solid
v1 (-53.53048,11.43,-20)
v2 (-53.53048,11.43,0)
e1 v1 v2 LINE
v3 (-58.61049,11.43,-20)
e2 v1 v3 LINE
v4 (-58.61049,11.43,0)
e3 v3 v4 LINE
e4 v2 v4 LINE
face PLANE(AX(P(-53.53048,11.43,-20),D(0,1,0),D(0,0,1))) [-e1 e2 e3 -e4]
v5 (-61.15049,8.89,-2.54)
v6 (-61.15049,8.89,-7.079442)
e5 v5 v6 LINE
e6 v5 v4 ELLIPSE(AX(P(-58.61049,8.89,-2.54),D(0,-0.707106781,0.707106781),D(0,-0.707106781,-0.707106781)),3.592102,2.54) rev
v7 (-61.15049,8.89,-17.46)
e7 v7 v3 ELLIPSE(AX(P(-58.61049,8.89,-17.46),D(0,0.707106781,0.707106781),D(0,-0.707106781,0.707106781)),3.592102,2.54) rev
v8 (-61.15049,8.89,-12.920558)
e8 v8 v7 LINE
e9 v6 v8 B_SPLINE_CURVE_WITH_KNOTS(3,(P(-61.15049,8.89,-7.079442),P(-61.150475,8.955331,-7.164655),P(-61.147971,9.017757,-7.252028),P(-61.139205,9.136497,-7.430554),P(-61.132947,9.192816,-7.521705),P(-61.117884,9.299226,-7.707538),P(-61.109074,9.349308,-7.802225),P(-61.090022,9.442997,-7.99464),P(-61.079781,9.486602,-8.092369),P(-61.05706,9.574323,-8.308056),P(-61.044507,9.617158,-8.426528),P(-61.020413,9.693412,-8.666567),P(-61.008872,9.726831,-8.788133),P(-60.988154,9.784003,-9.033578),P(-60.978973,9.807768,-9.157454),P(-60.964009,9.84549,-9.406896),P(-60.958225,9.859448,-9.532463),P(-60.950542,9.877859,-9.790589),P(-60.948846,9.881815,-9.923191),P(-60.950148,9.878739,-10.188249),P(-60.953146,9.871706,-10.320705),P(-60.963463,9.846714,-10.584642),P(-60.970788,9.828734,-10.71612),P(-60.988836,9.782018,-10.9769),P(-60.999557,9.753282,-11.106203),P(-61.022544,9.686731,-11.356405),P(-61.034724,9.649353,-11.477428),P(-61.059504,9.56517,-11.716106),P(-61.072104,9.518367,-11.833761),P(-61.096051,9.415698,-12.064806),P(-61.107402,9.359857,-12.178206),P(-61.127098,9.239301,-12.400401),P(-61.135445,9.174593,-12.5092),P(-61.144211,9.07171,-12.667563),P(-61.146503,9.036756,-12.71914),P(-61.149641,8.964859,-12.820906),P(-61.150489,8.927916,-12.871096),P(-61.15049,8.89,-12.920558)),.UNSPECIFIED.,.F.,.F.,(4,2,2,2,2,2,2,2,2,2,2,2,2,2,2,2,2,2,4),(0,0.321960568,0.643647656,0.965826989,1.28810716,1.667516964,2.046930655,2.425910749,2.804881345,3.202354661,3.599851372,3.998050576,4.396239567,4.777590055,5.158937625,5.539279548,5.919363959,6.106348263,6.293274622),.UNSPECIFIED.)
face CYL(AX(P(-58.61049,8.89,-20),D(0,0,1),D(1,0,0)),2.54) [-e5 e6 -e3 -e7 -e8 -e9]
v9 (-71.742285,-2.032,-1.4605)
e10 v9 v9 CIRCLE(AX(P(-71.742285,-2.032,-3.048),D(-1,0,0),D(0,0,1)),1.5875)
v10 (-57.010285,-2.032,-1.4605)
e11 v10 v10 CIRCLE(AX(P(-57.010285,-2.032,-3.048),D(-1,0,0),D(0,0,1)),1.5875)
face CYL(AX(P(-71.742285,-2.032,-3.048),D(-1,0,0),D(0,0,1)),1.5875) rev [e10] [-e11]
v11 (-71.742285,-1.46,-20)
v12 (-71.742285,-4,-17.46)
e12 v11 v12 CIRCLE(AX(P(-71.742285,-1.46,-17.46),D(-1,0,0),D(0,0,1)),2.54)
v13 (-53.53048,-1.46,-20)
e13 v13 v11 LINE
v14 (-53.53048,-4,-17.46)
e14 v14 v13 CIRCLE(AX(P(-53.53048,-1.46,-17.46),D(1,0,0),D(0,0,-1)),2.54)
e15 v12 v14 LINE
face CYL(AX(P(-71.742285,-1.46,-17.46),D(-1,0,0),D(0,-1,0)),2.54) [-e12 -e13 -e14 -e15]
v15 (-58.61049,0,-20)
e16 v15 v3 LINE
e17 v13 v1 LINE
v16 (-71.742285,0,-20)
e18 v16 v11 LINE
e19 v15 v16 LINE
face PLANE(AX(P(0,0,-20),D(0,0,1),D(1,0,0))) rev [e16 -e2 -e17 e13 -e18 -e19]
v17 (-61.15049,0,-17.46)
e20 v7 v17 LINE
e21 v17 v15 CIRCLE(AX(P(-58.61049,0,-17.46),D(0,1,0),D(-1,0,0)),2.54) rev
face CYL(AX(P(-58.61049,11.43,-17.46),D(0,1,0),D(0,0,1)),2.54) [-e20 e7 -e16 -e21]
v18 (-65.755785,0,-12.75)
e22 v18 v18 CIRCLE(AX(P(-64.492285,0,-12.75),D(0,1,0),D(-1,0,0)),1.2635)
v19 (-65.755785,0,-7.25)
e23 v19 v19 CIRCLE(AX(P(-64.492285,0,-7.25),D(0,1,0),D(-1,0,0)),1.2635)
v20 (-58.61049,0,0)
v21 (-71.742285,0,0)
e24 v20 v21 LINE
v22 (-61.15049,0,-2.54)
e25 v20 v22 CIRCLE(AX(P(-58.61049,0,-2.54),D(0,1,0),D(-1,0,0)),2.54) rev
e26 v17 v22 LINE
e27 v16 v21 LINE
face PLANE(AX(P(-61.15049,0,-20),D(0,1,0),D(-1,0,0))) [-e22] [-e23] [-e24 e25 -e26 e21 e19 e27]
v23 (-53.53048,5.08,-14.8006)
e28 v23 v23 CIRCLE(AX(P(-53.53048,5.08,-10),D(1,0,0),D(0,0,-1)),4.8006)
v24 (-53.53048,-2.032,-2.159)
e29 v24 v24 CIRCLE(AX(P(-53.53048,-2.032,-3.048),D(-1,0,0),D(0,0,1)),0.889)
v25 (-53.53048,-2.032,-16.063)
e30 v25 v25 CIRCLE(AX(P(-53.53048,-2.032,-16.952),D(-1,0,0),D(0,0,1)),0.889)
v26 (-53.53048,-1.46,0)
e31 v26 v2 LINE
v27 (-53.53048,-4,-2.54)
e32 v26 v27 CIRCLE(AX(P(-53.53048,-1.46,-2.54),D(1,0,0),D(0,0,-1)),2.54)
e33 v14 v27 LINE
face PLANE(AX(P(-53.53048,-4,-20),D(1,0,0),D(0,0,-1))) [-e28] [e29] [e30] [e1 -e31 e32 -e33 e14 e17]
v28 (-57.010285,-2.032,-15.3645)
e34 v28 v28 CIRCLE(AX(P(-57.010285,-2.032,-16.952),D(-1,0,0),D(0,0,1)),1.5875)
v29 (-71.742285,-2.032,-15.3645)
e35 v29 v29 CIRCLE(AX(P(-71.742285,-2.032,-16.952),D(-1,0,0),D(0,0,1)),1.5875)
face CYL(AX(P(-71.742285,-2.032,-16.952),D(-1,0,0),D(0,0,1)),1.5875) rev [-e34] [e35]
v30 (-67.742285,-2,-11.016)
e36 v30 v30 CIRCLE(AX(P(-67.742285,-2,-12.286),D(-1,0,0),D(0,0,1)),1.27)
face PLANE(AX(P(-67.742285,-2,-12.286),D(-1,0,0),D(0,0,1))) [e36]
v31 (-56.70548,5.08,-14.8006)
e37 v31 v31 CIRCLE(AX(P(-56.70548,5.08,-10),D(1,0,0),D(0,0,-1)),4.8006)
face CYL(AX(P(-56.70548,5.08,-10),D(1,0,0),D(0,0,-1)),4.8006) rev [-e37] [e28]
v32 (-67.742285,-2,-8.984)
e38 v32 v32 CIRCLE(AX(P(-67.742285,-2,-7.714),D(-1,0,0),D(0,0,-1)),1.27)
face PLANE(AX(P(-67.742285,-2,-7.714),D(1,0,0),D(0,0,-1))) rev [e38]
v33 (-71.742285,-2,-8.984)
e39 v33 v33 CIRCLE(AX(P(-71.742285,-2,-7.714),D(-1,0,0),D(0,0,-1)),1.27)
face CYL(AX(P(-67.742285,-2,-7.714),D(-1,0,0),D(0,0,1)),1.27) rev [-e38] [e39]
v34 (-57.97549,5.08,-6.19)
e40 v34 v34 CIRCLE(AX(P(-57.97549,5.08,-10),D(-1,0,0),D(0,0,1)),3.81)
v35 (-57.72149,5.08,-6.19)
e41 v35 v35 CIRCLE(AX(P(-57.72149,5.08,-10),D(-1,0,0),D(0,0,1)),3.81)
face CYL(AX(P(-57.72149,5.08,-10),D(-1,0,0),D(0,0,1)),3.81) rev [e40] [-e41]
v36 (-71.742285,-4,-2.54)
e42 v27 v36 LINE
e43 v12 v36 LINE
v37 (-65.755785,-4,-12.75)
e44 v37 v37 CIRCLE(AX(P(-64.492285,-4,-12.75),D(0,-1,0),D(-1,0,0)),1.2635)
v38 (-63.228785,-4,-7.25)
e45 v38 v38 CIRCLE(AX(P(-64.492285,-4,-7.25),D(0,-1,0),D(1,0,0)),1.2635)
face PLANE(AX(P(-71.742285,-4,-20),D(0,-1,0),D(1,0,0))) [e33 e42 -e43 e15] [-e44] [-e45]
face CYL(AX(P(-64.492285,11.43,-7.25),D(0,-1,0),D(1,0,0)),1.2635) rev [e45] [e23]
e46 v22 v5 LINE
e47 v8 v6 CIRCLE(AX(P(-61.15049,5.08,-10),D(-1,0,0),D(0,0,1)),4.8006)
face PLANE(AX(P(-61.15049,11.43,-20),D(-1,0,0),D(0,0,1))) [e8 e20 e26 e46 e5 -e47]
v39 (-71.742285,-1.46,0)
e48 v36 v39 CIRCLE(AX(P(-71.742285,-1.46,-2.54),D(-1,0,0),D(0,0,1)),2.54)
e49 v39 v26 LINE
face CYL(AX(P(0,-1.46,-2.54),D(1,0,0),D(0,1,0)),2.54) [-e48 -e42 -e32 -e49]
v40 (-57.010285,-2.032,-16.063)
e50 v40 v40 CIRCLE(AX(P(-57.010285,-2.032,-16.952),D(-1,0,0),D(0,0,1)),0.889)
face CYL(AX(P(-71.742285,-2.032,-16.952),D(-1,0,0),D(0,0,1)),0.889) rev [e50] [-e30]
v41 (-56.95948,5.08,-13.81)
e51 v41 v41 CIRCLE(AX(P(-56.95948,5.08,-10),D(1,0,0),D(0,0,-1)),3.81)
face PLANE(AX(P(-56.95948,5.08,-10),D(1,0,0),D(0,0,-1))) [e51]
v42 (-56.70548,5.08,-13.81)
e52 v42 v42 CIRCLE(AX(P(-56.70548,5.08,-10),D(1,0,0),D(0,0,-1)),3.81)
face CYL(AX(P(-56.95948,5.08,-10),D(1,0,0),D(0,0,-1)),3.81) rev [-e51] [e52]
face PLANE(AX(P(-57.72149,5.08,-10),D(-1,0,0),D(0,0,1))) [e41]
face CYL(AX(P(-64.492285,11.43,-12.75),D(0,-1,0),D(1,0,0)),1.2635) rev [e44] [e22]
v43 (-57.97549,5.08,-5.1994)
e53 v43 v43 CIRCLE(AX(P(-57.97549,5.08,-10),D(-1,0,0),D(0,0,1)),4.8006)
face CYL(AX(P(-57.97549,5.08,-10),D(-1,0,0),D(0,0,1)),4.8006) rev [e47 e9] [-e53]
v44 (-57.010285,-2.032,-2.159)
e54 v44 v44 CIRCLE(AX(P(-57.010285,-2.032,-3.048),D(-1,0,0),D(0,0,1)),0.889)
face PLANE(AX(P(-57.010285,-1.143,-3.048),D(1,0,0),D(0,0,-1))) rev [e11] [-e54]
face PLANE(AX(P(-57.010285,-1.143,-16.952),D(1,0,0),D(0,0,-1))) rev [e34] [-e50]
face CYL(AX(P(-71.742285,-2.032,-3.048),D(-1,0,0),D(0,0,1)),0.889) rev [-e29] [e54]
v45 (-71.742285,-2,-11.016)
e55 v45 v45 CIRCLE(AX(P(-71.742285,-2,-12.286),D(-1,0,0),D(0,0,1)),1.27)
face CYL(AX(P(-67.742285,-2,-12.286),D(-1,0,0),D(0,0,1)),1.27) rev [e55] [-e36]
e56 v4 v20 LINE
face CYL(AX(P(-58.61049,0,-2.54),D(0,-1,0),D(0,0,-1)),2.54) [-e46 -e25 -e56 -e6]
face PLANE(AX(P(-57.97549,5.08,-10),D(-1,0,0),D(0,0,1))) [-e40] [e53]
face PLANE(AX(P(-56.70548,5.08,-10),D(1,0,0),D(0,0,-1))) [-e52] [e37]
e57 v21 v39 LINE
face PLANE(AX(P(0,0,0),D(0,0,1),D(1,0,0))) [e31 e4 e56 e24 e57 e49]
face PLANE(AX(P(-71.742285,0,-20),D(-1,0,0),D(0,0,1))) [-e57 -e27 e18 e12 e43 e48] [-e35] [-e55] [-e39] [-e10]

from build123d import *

# Parameters (mm, degrees)
BOSS_EXTRUDE1_DEPTH                            = 20
SKETCH2_R                                      = 1.27
CUT_EXTRUDE1_DEPTH                             = 4.000000128
SKETCH3_R                                      = 4.8006
CUT_EXTRUDE2_DEPTH                             = 3.175
SKETCH4_R                                      = 3.81
CUT_EXTRUDE3_DEPTH                             = 0.254
CUT_EXTRUDE4_START                             = -3.175
SKETCH5_R                                      = 4.8006
CUT_EXTRUDE4_DEPTH                             = 3.175
CUT_EXTRUDE5_START                             = -0.254
SKETCH6_R                                      = 3.81
CUT_EXTRUDE5_DEPTH                             = 0.254
CBORE_FOR_0_SOCKET_HEAD_CAP_SCREW1_D           = 1.778
CBORE_FOR_0_SOCKET_HEAD_CAP_SCREW1_CBORE_D     = 3.175
CBORE_FOR_0_SOCKET_HEAD_CAP_SCREW1_CBORE_DEPTH = 14.732
FILLET1_R                                      = 2.54
SKETCH10_R                                     = 1.2635
CUT_EXTRUDE6_DEPTH                             = 77.059452864


with BuildPart() as part:
    # Sketch1 → Boss-Extrude1 (new body)
    with BuildSketch(Plane.XY):
        Polygon((-71.742285041, 0), (-71.742285041, -4), (-53.530479711, -4), (-53.530479711, 11.43), (-61.150490131, 11.43), (-61.150490131, 0), align=None)
    extrude(amount=-BOSS_EXTRUDE1_DEPTH)

    # Sketch2 → Cut-Extrude1 (cut)
    with BuildSketch(Plane.ZY.offset(71.742285041)):
        with Locations((-12.286, -2)):
            Circle(SKETCH2_R)
        with Locations(Location((-7.714, -2, 0), (0, 0, 180))):
            Circle(SKETCH2_R)
    extrude(amount=-CUT_EXTRUDE1_DEPTH, mode=Mode.SUBTRACT)

    # Sketch3 → Cut-Extrude2 (cut)
    with BuildSketch(Plane.ZY.offset(61.150490131)):
        with Locations((-10, 5.08)):
            Circle(SKETCH3_R)
    extrude(amount=-CUT_EXTRUDE2_DEPTH, mode=Mode.SUBTRACT)

    # Sketch4 → Cut-Extrude3 (cut)
    with BuildSketch(Plane.ZY.offset(57.975490131)):
        with Locations((-10, 5.08)):
            Circle(SKETCH4_R)
    extrude(amount=-CUT_EXTRUDE3_DEPTH, mode=Mode.SUBTRACT)

    # Sketch5 → Cut-Extrude4 (cut)
    with BuildSketch(Plane(origin=(-53.530479711, 0, 0), x_dir=(0, 0, -1), z_dir=(1, 0, 0)).offset(CUT_EXTRUDE4_START)):
        with Locations(Location((10, 5.08, 0), (0, 0, 180))):
            Circle(SKETCH5_R)
    extrude(amount=CUT_EXTRUDE4_DEPTH, mode=Mode.SUBTRACT)

    # Sketch6 → Cut-Extrude5 (cut)
    with BuildSketch(Plane(origin=(-56.705479711, 0, 0), x_dir=(0, 0, -1), z_dir=(1, 0, 0)).offset(CUT_EXTRUDE5_START)):
        with Locations(Location((10, 5.08, 0), (0, 0, 180))):
            Circle(SKETCH6_R)
    extrude(amount=CUT_EXTRUDE5_DEPTH, mode=Mode.SUBTRACT)

    # CBORE for #0 Socket Head Cap Screw1 (through all)
    with Locations(Plane.ZY.offset(71.742285041)):
        with Locations((-16.952, -2.032), (-3.048, -2.032)):
            CounterBoreHole(CBORE_FOR_0_SOCKET_HEAD_CAP_SCREW1_D / 2, CBORE_FOR_0_SOCKET_HEAD_CAP_SCREW1_CBORE_D / 2, CBORE_FOR_0_SOCKET_HEAD_CAP_SCREW1_CBORE_DEPTH)

    # Fillet1
    # the kernel refuses this fillet: 2.54 mm, written as the material it takes off along each edge
    with BuildSketch(Plane(origin=(-78.092285041, -4, -20), x_dir=(0, 1, 0), z_dir=(1, 0, 0))) as fillet1_piece_1:
        with BuildLine():
            CenterArc((FILLET1_R, FILLET1_R), FILLET1_R, 180, 90)
            Line((0, FILLET1_R), (0, 0))
            Line((0, 0), (FILLET1_R, 0))
        make_face()
    extrude(amount=30.91180533, mode=Mode.SUBTRACT)
    with BuildSketch(Plane(origin=(-61.150490131, 11.43, 6.35), x_dir=(0, -1, 0), z_dir=(0, 0, -1))) as fillet1_piece_2:
        with BuildLine():
            CenterArc((FILLET1_R, -FILLET1_R), FILLET1_R, 90, 90)
            Line((0, -FILLET1_R), (0, 0))
            Line((0, 0), (FILLET1_R, 0))
        make_face()
    extrude(amount=32.7, mode=Mode.SUBTRACT)
    with BuildSketch(Plane(origin=(-61.150490131, 17.78, -20), x_dir=(1, 0, 0), z_dir=(0, -1, 0))) as fillet1_piece_3:
        with BuildLine():
            CenterArc((FILLET1_R, FILLET1_R), FILLET1_R, 180, 90)
            Line((0, FILLET1_R), (0, 0))
            Line((0, 0), (FILLET1_R, 0))
        make_face()
    extrude(amount=17.78, mode=Mode.SUBTRACT)
    with BuildSketch(Plane(origin=(-61.150490131, 17.78, 0), x_dir=(1, 0, 0), z_dir=(0, -1, 0))) as fillet1_piece_4:
        with BuildLine():
            CenterArc((FILLET1_R, -FILLET1_R), FILLET1_R, 90, 90)
            Line((0, -FILLET1_R), (0, 0))
            Line((0, 0), (FILLET1_R, 0))
        make_face()
    extrude(amount=17.78, mode=Mode.SUBTRACT)
    with BuildSketch(Plane(origin=(-78.092285041, -4, 0), x_dir=(0, 1, 0), z_dir=(1, 0, 0))) as fillet1_piece_5:
        with BuildLine():
            CenterArc((FILLET1_R, -FILLET1_R), FILLET1_R, 90, 90)
            Line((0, -FILLET1_R), (0, 0))
            Line((0, 0), (FILLET1_R, 0))
        make_face()
    extrude(amount=30.91180533, mode=Mode.SUBTRACT)

    # Sketch10 → Cut-Extrude6 (cut, through all)
    with BuildSketch(Plane.XZ.offset(4)):
        with Locations((-64.492285063, -7.249999912)):
            Circle(SKETCH10_R)
        with Locations(Location((-64.492285063, -12.750000088, 0), (0, 0, 180))):
            Circle(SKETCH10_R)
    extrude(amount=-CUT_EXTRUDE6_DEPTH, mode=Mode.SUBTRACT)


solid = part.part
